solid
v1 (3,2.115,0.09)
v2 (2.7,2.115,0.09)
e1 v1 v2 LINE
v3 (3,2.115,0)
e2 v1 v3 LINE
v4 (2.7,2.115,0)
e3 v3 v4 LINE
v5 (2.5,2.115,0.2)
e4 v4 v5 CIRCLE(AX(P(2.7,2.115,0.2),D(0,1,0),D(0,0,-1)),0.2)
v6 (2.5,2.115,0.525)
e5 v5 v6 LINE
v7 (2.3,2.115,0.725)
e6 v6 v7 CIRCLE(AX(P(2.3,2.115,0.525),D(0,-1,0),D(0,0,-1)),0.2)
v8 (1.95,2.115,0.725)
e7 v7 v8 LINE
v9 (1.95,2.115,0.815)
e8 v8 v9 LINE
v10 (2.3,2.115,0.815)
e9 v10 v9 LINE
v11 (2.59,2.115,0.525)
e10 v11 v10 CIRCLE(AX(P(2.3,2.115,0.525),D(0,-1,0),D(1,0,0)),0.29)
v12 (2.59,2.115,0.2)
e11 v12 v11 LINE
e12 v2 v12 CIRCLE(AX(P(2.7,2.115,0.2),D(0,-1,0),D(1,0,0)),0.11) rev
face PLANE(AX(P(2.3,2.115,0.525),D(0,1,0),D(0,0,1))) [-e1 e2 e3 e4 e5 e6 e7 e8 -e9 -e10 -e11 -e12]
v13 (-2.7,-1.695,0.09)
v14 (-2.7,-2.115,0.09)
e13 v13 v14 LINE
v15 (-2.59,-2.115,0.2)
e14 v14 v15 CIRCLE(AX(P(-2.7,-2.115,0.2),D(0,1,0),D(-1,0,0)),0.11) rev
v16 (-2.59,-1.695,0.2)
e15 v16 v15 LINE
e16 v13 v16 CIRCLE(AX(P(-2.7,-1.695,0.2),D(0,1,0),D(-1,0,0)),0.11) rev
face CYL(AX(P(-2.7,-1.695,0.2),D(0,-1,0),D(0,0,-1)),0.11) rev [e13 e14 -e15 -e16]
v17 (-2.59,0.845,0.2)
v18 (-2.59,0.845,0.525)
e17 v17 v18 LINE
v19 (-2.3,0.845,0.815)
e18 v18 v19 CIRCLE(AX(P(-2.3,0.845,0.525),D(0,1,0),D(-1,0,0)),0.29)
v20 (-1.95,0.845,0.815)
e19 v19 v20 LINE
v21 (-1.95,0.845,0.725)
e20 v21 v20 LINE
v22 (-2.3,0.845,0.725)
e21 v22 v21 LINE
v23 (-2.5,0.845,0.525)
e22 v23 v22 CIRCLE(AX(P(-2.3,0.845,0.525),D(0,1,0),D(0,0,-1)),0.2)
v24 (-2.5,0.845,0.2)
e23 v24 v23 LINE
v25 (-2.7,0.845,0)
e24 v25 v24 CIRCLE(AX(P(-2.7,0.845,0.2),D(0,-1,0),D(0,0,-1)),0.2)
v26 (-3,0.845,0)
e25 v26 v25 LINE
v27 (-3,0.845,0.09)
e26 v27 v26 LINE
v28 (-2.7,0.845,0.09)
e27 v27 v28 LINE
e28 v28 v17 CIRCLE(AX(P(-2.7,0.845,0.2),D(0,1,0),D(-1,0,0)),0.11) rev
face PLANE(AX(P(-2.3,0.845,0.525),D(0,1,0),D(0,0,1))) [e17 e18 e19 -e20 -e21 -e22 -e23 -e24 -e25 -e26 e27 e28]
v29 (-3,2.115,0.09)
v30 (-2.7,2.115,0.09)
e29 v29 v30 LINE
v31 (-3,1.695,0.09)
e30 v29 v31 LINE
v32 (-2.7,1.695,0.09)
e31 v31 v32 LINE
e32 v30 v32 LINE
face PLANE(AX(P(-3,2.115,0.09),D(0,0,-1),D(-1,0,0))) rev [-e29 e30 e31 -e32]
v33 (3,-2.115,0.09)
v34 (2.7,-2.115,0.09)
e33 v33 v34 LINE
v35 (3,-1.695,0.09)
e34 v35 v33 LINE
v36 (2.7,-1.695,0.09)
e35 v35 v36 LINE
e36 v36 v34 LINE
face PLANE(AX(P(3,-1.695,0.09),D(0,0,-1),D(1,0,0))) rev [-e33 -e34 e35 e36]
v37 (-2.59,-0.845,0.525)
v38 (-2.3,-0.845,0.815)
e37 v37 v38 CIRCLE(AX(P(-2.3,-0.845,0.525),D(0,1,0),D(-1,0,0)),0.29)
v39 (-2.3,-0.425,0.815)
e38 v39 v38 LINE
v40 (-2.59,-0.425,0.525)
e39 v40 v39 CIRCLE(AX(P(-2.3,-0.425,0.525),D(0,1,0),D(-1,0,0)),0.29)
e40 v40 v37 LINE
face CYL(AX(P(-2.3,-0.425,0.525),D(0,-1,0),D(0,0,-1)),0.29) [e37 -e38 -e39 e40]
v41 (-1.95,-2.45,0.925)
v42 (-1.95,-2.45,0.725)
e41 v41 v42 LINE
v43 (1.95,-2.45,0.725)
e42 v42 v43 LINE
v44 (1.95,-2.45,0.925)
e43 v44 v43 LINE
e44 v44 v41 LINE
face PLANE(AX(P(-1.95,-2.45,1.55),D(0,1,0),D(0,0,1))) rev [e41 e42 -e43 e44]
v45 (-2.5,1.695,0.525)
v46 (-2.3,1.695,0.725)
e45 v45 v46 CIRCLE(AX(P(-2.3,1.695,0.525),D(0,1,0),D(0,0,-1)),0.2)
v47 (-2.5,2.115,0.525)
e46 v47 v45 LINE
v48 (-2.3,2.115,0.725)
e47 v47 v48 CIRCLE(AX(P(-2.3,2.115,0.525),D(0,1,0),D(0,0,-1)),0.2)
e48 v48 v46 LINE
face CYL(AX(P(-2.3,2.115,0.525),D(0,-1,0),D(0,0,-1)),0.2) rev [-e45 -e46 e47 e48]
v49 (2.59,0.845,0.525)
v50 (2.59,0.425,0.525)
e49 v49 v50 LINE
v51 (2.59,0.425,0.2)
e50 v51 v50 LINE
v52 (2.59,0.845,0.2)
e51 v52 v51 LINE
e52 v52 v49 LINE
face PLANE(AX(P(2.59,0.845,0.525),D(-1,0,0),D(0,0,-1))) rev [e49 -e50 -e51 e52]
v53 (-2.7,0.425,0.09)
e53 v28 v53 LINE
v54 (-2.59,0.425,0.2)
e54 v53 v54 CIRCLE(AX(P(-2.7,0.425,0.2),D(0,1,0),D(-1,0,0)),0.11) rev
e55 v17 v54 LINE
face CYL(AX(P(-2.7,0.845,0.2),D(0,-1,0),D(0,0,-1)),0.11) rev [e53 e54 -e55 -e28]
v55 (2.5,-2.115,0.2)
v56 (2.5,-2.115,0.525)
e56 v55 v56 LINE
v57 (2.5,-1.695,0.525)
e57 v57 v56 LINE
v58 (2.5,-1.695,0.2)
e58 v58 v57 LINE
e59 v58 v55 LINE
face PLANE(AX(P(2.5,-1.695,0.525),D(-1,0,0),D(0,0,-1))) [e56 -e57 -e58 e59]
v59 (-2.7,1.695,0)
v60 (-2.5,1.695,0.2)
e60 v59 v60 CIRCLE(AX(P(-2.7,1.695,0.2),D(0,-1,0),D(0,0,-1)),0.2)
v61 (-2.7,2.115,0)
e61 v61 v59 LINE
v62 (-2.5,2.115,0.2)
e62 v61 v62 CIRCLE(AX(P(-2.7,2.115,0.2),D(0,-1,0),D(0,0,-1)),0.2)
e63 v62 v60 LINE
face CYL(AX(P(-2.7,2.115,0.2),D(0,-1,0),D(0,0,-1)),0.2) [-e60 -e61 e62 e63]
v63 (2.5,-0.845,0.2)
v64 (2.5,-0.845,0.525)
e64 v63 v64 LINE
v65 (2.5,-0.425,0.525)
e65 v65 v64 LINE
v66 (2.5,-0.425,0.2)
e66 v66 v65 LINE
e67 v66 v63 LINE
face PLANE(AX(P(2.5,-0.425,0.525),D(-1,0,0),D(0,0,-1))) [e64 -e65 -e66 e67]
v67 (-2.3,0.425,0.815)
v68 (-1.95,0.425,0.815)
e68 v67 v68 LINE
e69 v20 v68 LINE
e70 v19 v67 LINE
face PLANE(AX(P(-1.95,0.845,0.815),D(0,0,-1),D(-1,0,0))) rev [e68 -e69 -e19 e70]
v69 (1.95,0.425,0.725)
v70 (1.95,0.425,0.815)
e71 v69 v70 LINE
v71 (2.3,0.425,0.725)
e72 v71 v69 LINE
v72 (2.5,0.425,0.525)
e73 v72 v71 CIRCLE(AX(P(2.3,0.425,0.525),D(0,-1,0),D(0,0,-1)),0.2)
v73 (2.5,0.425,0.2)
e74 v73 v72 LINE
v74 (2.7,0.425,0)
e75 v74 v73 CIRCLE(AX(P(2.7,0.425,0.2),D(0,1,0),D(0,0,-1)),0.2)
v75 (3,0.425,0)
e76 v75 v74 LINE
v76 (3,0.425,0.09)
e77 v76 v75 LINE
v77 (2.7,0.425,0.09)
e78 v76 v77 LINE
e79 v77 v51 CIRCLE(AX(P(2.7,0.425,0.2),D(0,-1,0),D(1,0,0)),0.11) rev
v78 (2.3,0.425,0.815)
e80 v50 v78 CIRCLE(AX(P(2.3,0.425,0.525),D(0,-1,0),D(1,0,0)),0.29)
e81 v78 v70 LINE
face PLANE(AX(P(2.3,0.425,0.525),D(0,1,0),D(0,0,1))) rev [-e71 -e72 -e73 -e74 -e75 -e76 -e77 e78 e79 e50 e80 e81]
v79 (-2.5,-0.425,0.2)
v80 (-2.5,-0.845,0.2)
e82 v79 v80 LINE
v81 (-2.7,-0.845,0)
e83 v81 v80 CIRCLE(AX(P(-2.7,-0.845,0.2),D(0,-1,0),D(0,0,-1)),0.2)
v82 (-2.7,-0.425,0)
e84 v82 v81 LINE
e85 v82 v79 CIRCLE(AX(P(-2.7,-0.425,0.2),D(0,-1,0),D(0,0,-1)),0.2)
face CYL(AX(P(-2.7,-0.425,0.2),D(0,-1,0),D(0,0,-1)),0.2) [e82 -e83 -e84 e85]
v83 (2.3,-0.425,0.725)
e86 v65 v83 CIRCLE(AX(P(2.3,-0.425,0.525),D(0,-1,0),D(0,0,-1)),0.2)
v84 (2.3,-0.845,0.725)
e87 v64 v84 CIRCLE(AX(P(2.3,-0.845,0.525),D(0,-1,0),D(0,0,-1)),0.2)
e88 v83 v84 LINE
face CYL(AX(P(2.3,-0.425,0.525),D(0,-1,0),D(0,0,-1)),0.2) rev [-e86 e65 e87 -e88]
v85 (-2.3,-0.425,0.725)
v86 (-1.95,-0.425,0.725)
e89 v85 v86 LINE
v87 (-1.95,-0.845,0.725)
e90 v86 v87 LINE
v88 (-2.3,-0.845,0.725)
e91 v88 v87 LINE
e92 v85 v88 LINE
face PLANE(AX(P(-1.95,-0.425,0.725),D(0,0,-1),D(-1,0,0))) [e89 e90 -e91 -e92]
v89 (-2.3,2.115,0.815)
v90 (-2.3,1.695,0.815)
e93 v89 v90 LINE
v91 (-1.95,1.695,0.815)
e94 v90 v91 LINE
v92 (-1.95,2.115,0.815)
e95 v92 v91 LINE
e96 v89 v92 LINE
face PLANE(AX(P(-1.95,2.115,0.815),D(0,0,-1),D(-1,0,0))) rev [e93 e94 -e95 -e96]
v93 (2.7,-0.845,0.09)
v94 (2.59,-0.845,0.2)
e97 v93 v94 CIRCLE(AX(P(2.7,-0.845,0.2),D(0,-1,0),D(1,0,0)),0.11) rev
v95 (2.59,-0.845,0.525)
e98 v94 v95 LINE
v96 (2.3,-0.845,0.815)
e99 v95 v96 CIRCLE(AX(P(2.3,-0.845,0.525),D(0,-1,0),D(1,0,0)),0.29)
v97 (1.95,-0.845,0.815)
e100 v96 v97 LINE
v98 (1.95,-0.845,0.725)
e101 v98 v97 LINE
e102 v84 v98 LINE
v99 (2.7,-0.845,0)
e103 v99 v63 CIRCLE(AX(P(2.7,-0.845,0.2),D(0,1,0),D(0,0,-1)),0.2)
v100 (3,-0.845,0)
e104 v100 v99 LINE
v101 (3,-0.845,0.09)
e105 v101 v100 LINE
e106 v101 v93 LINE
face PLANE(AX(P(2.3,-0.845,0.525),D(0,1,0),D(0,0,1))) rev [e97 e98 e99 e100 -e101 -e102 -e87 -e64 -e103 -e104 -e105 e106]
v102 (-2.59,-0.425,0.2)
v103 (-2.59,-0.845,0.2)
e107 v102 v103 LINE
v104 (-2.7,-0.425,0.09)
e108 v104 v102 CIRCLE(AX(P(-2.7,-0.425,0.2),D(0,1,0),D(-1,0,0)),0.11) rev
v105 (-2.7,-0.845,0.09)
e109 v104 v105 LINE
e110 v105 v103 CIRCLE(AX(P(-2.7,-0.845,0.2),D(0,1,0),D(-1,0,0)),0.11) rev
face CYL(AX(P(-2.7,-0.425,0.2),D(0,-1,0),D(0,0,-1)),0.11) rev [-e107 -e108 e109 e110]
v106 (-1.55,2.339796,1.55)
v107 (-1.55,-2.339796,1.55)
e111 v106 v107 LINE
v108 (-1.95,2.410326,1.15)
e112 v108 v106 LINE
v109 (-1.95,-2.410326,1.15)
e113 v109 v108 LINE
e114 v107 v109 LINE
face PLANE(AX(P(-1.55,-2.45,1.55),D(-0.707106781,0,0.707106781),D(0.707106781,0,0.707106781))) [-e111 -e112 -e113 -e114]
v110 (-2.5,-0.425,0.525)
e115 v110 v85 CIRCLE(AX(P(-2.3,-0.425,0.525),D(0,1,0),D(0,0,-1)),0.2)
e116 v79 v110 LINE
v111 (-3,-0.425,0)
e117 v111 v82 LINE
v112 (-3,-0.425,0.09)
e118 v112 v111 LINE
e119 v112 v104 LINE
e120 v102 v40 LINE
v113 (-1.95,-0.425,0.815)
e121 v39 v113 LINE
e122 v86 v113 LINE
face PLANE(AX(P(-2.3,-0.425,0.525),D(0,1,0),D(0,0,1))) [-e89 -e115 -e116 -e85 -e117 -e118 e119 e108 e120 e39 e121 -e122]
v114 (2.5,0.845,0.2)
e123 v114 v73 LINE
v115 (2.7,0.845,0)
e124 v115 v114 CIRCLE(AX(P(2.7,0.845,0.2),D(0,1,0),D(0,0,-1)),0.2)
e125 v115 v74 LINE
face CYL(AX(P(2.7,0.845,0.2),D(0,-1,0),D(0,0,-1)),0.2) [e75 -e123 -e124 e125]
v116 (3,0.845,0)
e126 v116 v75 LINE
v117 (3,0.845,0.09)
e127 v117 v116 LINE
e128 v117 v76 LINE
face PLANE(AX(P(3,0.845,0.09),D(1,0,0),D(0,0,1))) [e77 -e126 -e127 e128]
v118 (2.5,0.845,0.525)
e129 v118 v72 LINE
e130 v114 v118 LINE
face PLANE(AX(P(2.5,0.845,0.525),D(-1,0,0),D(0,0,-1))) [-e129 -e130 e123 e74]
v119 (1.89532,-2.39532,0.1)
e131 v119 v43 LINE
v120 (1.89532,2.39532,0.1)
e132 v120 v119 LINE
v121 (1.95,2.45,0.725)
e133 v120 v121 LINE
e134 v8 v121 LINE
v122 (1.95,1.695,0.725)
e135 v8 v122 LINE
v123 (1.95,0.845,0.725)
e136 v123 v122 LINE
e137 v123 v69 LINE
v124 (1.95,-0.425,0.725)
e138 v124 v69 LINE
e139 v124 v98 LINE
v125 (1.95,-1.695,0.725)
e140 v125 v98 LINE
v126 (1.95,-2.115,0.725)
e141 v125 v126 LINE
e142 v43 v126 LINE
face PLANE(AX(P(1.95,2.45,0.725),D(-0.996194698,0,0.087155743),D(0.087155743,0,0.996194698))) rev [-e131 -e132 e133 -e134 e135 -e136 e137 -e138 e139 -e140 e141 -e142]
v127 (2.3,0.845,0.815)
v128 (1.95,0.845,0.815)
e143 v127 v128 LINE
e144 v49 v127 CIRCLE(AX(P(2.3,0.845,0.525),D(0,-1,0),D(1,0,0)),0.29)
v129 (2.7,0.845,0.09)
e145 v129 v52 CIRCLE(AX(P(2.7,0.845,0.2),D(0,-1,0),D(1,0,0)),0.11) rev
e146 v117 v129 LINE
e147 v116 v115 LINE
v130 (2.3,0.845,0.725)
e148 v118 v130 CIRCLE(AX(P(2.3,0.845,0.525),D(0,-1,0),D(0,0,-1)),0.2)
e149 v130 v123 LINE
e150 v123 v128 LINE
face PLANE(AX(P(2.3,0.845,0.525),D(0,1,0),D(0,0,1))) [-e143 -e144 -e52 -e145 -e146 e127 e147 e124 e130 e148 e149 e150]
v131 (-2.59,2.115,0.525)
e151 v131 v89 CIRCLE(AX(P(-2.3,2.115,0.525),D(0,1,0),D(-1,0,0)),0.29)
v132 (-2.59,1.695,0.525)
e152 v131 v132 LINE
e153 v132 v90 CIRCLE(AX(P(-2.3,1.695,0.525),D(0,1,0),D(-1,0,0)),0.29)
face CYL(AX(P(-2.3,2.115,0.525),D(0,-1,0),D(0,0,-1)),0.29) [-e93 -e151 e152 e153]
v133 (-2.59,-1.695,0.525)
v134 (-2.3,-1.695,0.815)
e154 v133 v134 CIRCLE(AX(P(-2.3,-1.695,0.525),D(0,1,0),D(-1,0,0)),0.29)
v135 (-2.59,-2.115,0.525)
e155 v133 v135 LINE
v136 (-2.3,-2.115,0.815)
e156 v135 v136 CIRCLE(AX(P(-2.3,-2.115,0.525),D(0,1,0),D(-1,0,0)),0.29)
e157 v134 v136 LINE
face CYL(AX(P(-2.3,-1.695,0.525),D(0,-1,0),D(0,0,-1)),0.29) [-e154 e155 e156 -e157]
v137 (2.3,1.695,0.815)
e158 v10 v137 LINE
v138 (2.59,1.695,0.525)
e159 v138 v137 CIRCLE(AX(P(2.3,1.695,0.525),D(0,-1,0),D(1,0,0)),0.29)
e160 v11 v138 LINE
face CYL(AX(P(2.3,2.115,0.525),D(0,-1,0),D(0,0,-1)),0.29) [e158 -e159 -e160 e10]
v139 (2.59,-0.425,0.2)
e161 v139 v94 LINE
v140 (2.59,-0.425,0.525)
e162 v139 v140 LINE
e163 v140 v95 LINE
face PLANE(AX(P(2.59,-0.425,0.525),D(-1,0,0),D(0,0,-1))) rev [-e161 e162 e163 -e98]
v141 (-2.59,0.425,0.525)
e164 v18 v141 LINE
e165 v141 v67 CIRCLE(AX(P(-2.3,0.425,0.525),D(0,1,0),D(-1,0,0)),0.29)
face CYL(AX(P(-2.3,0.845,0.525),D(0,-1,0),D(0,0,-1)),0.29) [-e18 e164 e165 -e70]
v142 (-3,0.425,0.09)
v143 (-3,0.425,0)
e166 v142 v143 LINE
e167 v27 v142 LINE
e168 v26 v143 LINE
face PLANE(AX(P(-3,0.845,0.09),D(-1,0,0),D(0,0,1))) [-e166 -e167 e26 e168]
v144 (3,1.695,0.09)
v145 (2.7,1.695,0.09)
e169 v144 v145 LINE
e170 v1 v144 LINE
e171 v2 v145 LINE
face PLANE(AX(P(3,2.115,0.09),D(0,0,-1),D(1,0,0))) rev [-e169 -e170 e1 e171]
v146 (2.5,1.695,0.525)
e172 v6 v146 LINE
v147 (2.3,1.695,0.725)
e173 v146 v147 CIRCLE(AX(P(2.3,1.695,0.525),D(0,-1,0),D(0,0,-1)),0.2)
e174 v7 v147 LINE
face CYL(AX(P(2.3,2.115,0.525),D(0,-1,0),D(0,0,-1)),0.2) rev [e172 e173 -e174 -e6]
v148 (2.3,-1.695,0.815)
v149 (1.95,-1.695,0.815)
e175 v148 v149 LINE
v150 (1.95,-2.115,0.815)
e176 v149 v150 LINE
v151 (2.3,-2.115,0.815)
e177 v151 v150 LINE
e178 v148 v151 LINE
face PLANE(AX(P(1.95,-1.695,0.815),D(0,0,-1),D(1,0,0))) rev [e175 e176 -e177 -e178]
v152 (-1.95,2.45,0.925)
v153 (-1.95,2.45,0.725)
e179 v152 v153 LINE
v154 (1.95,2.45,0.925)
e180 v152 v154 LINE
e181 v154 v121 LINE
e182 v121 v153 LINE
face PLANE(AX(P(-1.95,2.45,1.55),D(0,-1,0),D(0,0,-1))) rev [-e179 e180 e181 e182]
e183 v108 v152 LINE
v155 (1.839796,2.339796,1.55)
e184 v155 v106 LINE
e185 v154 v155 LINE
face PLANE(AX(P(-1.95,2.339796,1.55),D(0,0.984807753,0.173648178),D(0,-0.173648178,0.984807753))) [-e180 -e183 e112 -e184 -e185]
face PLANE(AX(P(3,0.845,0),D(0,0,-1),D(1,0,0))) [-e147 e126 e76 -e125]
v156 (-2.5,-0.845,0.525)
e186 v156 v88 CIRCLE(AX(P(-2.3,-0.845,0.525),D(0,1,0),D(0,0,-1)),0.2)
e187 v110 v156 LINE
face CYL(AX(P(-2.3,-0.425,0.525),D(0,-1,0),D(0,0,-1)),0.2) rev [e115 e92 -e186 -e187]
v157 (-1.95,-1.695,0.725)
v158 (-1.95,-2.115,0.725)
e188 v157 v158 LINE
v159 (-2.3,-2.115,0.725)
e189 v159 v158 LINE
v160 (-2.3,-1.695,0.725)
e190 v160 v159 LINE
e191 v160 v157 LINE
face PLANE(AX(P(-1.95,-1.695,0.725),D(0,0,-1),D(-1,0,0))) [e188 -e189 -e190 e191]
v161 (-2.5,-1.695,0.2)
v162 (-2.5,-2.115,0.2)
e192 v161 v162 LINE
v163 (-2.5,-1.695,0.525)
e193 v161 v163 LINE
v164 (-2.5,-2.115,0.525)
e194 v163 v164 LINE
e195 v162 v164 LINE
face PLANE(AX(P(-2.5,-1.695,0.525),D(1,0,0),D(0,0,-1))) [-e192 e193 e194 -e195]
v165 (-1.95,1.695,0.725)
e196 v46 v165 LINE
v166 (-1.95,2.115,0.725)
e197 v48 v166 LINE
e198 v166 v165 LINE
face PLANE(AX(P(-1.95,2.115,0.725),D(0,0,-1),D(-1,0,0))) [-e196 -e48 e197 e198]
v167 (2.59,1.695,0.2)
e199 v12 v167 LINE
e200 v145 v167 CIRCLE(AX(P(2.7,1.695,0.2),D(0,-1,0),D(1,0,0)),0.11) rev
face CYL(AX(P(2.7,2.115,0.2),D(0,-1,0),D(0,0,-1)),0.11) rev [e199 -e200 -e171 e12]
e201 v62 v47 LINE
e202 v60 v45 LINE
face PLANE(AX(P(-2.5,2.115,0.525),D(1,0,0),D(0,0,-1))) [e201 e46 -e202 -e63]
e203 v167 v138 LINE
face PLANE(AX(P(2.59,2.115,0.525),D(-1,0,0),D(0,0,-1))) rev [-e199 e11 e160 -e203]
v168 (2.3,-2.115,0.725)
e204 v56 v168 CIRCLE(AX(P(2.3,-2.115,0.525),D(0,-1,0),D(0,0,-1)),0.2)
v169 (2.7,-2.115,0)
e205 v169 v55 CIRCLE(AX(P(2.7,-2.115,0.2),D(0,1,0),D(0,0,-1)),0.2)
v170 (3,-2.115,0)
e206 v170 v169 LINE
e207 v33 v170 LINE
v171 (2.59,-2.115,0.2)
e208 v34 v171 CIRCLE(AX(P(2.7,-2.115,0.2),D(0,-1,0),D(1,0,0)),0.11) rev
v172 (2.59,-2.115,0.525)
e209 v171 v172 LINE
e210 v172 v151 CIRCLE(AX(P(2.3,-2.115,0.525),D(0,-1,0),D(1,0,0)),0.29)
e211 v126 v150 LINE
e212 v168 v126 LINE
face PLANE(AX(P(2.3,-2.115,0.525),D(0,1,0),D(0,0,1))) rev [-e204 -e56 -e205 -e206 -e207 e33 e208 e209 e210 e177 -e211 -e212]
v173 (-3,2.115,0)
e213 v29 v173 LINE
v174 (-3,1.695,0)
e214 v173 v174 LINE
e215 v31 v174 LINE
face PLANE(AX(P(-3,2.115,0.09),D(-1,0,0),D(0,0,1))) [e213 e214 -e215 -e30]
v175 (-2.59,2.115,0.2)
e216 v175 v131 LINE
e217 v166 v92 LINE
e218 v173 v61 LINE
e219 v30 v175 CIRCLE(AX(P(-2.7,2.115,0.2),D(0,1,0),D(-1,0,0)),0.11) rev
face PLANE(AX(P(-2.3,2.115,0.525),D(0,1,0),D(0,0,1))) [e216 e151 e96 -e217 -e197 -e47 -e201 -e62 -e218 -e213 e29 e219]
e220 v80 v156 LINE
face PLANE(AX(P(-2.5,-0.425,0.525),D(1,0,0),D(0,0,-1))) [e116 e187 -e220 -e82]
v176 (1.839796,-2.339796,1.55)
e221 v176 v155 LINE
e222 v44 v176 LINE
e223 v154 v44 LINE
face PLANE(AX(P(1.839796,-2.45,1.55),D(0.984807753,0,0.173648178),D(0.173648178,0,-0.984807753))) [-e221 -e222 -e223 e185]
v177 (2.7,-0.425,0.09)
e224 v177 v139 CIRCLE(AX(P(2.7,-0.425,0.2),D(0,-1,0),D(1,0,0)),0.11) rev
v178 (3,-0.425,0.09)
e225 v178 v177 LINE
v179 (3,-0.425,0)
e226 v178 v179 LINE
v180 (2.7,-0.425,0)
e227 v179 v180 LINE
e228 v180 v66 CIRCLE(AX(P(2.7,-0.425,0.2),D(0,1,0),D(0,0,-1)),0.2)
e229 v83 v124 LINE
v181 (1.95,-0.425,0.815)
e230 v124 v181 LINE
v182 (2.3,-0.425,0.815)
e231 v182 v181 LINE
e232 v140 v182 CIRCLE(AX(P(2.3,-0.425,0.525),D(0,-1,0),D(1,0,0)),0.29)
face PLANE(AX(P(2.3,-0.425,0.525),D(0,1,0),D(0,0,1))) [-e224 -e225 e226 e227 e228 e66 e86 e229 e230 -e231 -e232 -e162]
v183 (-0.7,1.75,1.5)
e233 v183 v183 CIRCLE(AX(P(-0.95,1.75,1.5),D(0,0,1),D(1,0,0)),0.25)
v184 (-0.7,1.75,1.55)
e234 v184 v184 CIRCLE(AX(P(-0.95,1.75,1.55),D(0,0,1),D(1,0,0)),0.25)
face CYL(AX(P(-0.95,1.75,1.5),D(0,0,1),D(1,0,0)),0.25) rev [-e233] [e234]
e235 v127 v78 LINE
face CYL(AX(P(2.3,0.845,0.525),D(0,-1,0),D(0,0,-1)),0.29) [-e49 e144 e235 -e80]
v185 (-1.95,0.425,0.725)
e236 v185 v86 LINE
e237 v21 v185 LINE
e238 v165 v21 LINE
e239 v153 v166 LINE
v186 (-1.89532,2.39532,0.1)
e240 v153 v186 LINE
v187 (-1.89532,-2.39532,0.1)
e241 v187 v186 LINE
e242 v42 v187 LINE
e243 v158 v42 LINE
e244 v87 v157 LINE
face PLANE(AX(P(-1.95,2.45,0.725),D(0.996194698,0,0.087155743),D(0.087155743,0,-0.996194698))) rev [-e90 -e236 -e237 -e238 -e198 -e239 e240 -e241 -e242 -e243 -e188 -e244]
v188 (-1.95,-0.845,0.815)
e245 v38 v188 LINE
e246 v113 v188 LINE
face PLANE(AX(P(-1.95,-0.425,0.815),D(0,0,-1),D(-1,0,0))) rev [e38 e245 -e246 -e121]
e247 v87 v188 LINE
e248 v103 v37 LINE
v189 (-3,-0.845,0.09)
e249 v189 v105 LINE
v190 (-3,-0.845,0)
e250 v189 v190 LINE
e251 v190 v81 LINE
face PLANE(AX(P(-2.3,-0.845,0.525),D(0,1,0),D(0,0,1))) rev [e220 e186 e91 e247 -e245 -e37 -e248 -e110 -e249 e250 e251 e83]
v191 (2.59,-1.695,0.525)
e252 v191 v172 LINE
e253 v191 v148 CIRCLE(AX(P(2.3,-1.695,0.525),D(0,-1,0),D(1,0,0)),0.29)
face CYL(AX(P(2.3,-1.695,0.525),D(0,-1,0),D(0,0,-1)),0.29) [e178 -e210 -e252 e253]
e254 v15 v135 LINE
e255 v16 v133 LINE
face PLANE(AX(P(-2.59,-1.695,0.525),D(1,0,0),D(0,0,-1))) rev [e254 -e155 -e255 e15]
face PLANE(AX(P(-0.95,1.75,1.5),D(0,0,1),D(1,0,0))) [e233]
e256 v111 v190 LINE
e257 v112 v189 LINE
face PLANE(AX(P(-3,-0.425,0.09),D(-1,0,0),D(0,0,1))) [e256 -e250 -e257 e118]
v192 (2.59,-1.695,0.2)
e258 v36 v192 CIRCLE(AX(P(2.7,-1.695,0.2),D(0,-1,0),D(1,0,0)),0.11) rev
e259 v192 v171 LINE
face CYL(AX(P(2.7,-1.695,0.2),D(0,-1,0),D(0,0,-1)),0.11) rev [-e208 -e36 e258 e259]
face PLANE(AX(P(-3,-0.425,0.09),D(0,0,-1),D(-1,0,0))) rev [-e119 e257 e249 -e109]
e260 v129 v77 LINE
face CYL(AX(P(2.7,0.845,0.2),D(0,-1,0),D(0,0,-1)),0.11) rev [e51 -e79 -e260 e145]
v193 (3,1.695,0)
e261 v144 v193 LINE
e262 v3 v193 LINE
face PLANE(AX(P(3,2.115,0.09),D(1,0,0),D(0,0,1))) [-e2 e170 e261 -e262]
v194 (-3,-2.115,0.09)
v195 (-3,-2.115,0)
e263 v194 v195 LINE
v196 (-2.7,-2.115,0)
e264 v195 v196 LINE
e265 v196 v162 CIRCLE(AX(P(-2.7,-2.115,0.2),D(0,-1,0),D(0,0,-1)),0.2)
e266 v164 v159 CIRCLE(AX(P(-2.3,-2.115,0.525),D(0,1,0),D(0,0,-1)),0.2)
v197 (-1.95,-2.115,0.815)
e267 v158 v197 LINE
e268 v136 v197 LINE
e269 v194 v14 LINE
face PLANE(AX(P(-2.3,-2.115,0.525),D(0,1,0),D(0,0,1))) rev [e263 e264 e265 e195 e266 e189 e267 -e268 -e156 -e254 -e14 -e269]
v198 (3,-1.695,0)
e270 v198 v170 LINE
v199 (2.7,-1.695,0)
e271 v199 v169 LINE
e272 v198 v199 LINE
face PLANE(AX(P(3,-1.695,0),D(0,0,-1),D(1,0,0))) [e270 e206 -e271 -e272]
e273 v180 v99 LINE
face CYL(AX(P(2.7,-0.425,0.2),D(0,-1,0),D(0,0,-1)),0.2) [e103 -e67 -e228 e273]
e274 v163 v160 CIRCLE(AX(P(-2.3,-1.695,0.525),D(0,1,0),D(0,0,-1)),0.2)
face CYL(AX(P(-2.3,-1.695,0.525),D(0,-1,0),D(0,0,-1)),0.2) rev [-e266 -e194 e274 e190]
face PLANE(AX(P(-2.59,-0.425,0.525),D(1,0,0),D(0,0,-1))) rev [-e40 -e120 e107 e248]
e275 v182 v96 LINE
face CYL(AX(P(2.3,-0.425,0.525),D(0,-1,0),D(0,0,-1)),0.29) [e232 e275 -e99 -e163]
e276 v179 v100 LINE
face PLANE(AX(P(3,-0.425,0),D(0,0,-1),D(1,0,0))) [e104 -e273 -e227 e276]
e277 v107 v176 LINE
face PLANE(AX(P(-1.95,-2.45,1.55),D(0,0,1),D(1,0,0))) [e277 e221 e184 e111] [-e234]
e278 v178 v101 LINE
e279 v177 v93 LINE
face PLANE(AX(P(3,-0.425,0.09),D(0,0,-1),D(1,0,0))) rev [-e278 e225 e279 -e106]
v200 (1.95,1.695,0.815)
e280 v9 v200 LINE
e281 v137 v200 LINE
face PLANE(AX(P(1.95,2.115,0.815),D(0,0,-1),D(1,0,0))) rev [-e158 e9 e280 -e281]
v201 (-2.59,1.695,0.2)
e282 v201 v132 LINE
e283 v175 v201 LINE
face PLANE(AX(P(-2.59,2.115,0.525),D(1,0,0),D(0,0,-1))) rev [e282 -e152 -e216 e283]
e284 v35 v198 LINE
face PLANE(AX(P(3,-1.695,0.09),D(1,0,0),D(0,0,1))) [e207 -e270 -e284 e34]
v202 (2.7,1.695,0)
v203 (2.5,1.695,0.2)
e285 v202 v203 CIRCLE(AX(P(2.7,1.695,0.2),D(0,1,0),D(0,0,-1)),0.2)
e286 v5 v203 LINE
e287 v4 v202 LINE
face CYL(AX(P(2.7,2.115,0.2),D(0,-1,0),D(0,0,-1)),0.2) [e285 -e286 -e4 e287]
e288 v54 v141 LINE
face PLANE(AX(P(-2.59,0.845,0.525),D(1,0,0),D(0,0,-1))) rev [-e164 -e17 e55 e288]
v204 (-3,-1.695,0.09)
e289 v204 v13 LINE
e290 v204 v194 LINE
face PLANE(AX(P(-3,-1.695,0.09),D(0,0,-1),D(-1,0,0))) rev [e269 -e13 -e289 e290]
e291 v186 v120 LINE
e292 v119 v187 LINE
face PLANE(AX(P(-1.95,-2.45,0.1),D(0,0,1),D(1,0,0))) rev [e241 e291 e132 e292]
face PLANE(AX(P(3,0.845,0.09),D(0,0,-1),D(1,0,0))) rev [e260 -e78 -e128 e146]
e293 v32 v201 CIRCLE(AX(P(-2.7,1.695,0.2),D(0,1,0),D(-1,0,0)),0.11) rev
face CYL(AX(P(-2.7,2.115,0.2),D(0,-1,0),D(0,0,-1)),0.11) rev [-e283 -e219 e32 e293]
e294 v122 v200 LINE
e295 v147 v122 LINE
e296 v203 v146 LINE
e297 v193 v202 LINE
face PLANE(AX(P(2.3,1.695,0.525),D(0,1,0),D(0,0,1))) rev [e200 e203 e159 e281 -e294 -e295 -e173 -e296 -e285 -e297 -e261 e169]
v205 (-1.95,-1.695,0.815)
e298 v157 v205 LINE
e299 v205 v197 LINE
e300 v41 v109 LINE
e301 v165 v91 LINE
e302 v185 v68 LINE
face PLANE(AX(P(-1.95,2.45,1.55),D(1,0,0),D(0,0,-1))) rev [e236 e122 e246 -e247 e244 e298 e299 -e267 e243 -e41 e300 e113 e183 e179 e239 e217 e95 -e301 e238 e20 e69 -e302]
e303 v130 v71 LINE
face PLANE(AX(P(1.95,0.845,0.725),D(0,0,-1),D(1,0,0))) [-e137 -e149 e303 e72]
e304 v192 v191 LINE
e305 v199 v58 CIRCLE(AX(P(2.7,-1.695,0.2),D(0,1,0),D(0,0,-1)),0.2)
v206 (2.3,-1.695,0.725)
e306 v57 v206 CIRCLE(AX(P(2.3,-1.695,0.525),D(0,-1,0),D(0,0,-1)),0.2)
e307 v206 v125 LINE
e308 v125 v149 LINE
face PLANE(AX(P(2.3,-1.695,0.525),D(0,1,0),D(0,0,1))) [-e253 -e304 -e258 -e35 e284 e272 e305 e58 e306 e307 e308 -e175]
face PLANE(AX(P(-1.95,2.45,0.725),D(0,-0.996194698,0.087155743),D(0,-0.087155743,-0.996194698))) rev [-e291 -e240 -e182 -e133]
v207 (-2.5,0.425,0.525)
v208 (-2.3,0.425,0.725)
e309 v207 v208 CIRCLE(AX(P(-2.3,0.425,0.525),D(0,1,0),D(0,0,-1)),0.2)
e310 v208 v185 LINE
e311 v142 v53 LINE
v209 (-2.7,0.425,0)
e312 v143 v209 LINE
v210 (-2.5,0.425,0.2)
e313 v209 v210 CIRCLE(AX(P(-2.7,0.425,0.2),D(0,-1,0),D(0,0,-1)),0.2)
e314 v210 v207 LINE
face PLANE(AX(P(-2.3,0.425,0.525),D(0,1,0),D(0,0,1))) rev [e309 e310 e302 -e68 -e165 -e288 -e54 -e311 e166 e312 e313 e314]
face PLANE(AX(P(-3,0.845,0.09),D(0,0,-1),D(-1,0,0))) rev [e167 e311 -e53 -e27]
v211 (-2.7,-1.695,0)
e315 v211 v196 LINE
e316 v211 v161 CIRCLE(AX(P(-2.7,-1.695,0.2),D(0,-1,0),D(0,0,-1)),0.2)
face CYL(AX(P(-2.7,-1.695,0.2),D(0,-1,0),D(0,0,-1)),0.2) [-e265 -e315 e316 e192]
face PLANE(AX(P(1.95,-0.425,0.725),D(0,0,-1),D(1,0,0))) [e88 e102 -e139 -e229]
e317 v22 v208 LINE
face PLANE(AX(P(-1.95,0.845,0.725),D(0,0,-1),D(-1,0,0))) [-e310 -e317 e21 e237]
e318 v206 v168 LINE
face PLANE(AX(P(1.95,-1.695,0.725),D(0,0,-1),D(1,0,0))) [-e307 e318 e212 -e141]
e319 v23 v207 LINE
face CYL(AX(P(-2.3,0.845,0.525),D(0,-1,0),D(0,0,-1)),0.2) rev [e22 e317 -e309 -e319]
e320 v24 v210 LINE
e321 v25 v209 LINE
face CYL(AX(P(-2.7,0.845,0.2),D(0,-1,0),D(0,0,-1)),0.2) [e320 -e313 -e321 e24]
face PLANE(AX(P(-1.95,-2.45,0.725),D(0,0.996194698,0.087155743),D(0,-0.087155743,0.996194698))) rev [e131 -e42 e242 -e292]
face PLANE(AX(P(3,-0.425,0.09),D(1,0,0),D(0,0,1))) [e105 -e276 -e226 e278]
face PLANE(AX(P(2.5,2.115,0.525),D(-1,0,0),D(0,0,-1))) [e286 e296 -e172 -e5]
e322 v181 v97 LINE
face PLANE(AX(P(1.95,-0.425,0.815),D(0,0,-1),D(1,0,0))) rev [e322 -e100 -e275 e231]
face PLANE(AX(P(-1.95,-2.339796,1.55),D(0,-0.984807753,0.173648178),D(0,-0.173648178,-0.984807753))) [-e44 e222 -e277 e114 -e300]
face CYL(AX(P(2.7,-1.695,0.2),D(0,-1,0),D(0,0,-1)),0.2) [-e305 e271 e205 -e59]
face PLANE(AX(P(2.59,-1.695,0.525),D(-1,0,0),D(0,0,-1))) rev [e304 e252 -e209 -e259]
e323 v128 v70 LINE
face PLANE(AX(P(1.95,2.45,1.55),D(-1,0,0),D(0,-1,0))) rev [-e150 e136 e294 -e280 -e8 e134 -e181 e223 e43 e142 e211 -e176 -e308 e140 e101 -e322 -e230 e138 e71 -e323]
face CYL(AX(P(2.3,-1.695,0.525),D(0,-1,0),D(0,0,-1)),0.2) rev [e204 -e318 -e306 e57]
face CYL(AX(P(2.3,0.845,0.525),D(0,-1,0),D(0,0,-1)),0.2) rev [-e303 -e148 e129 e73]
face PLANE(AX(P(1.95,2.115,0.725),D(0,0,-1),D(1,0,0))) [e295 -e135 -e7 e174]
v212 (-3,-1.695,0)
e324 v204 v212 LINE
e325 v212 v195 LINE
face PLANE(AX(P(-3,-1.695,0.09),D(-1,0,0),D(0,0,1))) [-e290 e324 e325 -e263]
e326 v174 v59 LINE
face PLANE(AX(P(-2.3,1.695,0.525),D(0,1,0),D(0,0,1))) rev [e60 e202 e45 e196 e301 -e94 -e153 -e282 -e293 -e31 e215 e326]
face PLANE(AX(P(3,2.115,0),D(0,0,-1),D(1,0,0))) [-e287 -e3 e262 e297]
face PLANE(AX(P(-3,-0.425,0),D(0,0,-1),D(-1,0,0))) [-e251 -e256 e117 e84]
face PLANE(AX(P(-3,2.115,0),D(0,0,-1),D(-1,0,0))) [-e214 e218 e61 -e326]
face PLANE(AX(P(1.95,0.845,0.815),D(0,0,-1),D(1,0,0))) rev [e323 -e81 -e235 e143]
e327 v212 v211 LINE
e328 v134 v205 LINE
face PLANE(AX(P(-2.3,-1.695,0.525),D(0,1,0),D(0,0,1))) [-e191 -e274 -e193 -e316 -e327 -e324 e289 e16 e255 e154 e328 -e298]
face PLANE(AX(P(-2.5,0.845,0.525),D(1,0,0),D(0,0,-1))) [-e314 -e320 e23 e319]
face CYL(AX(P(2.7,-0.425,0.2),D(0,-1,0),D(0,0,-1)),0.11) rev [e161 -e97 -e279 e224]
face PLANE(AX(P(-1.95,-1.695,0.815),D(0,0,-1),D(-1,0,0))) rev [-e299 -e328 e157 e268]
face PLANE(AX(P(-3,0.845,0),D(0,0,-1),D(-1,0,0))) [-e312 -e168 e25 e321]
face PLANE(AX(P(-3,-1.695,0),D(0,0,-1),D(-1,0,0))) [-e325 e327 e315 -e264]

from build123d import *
from OCP.BRepFilletAPI import BRepFilletAPI_MakeChamfer

# Parameters (mm, degrees)
ESQUISSE2_W              = 3.9
ESQUISSE2_H              = 4.9
CORP_DEPTH               = 1.45
PIN_1_DEPTH              = 0.21
R_P_TITION_PIN_1_4_COUNT = 4
R_P_TITION_PIN_1_4_PITCH = 1.27
SYM_TRIE1_COPY_1_DEPTH   = 0.21
SYM_TRIE1_COPY_2_DEPTH   = 0.21
SYM_TRIE1_COPY_3_DEPTH   = 0.21
CHANFREIN4_SIZE          = 0.625
CHANFREIN4_SIZE2         = 0.110204363
CHANFREIN5_SIZE          = 0.625
CHANFREIN5_SIZE_2        = 0.054680415
ESQUISSE8_R              = 0.25
ENL_V_MAT_EXTRU_1_DEPTH  = 0.05
CHANFREIN7_SIZE          = 0.4


with BuildPart() as part:
    # Esquisse2 → corp (new body)
    with BuildSketch(Plane.XY.offset(0.1)):
        Rectangle(ESQUISSE2_W, ESQUISSE2_H)
    extrude(amount=CORP_DEPTH)

    # Esquisse6 → pin 1 (add, symmetric)
    with BuildSketch(Plane(origin=(0, 1.905, 0), x_dir=(-1, 0, 0), z_dir=(0, 1, 0))):
        with BuildLine():
            Line((1.95, 0.725), (2.3, 0.725))
            ThreePointArc((2.3, 0.725), (2.441421356, 0.666421356), (2.5, 0.525))
            Line((2.5, 0.525), (2.5, 0.2))
            ThreePointArc((2.5, 0.2), (2.558578644, 0.058578644), (2.7, 0))
            Line((2.7, 0), (3, 0))
            Line((3, 0), (3, 0.09))
            Line((3, 0.09), (2.7, 0.09))
            ThreePointArc((2.7, 0.09), (2.622218254, 0.122218254), (2.59, 0.2))
            Line((2.59, 0.2), (2.59, 0.525))
            ThreePointArc((2.59, 0.525), (2.505060967, 0.730060967), (2.3, 0.815))
            Line((2.3, 0.815), (1.95, 0.815))
            Line((1.95, 0.815), (1.95, 0.725))
        make_face()
    pin_1 = extrude(amount=PIN_1_DEPTH, both=True)

    # Répétition pin 1-4: pin 1 ×4
    with Locations(*[(0, -i * R_P_TITION_PIN_1_4_PITCH, 0) for i in range(1, R_P_TITION_PIN_1_4_COUNT)]):
        add(pin_1)

    # Symétrie1: pin 1 across plane
    add(pin_1.mirror(Plane(origin=(0, 0, 0), x_dir=(0, 0, 1), z_dir=(1, 0, 0))))

    # Symétrie1 copy 1 sketch → Symétrie1 copy 1 (add, symmetric)
    with BuildSketch(Plane(origin=(0, 0.635, 0), x_dir=(1, 0, 0), z_dir=(0, 1, 0))):
        with BuildLine():
            Line((1.95, -0.725), (2.3, -0.725))
            ThreePointArc((2.3, -0.725), (2.441421356, -0.666421356), (2.5, -0.525))
            Line((2.5, -0.525), (2.5, -0.2))
            ThreePointArc((2.5, -0.2), (2.558578644, -0.058578644), (2.7, 0))
            Line((2.7, 0), (3, 0))
            Line((3, 0), (3, -0.09))
            Line((3, -0.09), (2.7, -0.09))
            ThreePointArc((2.7, -0.09), (2.622218254, -0.122218254), (2.59, -0.2))
            Line((2.59, -0.2), (2.59, -0.525))
            ThreePointArc((2.59, -0.525), (2.505060967, -0.730060967), (2.3, -0.815))
            Line((2.3, -0.815), (1.95, -0.815))
            Line((1.95, -0.815), (1.95, -0.725))
        make_face()
    extrude(amount=SYM_TRIE1_COPY_1_DEPTH, both=True)

    # Symétrie1 copy 2 sketch → Symétrie1 copy 2 (add, symmetric)
    with BuildSketch(Plane(origin=(0, -0.635, 0), x_dir=(1, 0, 0), z_dir=(0, 1, 0))):
        with BuildLine():
            Line((1.95, -0.725), (2.3, -0.725))
            ThreePointArc((2.3, -0.725), (2.441421356, -0.666421356), (2.5, -0.525))
            Line((2.5, -0.525), (2.5, -0.2))
            ThreePointArc((2.5, -0.2), (2.558578644, -0.058578644), (2.7, 0))
            Line((2.7, 0), (3, 0))
            Line((3, 0), (3, -0.09))
            Line((3, -0.09), (2.7, -0.09))
            ThreePointArc((2.7, -0.09), (2.622218254, -0.122218254), (2.59, -0.2))
            Line((2.59, -0.2), (2.59, -0.525))
            ThreePointArc((2.59, -0.525), (2.505060967, -0.730060967), (2.3, -0.815))
            Line((2.3, -0.815), (1.95, -0.815))
            Line((1.95, -0.815), (1.95, -0.725))
        make_face()
    extrude(amount=SYM_TRIE1_COPY_2_DEPTH, both=True)

    # Symétrie1 copy 3 sketch → Symétrie1 copy 3 (add, symmetric)
    with BuildSketch(Plane(origin=(0, -1.905, 0), x_dir=(1, 0, 0), z_dir=(0, 1, 0))):
        with BuildLine():
            Line((1.95, -0.725), (2.3, -0.725))
            ThreePointArc((2.3, -0.725), (2.441421356, -0.666421356), (2.5, -0.525))
            Line((2.5, -0.525), (2.5, -0.2))
            ThreePointArc((2.5, -0.2), (2.558578644, -0.058578644), (2.7, 0))
            Line((2.7, 0), (3, 0))
            Line((3, 0), (3, -0.09))
            Line((3, -0.09), (2.7, -0.09))
            ThreePointArc((2.7, -0.09), (2.622218254, -0.122218254), (2.59, -0.2))
            Line((2.59, -0.2), (2.59, -0.525))
            ThreePointArc((2.59, -0.525), (2.505060967, -0.730060967), (2.3, -0.815))
            Line((2.3, -0.815), (1.95, -0.815))
            Line((1.95, -0.815), (1.95, -0.725))
        make_face()
    extrude(amount=SYM_TRIE1_COPY_3_DEPTH, both=True)

    # Chanfrein4: one chamfer whose edges measure the first distance from different faces: ONE call of the kernel's chamfer builder (chamfer() names one face for all edges)
    chanfrein4_edges_1 = [part.edges().sort_by_distance(p)[0] for p in [
        (1.95, 0, 1.55),
    ]]
    chanfrein4_side_1 = [part.faces().sort_by_distance(p)[0] for p in [
        (1.95, 0, 0.826195893),
    ]]
    chanfrein4_edges_2 = [part.edges().sort_by_distance(p)[0] for p in [
        (0, 2.45, 1.55),
    ]]
    chanfrein4_side_2 = [part.faces().sort_by_distance(p)[0] for p in [
        (0, 2.45, 0.825),
    ]]
    chanfrein4_edges_3 = [part.edges().sort_by_distance(p)[0] for p in [
        (0, -2.45, 1.55),
    ]]
    chanfrein4_side_3 = [part.faces().sort_by_distance(p)[0] for p in [
        (0, -2.45, 0.825),
    ]]
    chanfrein4 = BRepFilletAPI_MakeChamfer(part.part.solid().wrapped)
    for e in chanfrein4_edges_1:
        chanfrein4.Add(CHANFREIN4_SIZE, CHANFREIN4_SIZE2, e.wrapped, chanfrein4_side_1[0].wrapped)  # the first distance lies on this face
    for e in chanfrein4_edges_2:
        chanfrein4.Add(CHANFREIN4_SIZE, CHANFREIN4_SIZE2, e.wrapped, chanfrein4_side_2[0].wrapped)  # the first distance lies on this face
    for e in chanfrein4_edges_3:
        chanfrein4.Add(CHANFREIN4_SIZE, CHANFREIN4_SIZE2, e.wrapped, chanfrein4_side_3[0].wrapped)  # the first distance lies on this face
    add(Compound.cast(chanfrein4.Shape()), mode=Mode.REPLACE)

    # Chanfrein5
    chanfrein5_edges_1 = [part.edges().sort_by_distance(p)[0] for p in [
        (0, 2.45, 0.1),
    ]]
    chanfrein5_side_1 = [part.faces().sort_by_distance(p)[0] for p in [
        (0, 2.45, 0.101093608),
    ]]
    chanfrein5_edges_2 = [part.edges().sort_by_distance(p)[0] for p in [
        (1.95, 0, 0.1),
    ]]
    chanfrein5_side_2 = [part.faces().sort_by_distance(p)[0] for p in [
        (1.948906392, 0, 0.1),
    ]]
    chanfrein5_edges_3 = [part.edges().sort_by_distance(p)[0] for p in [
        (0, -2.45, 0.1),
    ]]
    chanfrein5_side_3 = [part.faces().sort_by_distance(p)[0] for p in [
        (0, -2.448906392, 0.1),
    ]]
    chanfrein5_edges_4 = [part.edges().sort_by_distance(p)[0] for p in [
        (-1.95, 0, 0.1),
    ]]
    chanfrein5_side_4 = [part.faces().sort_by_distance(p)[0] for p in [
        (-1.95, 0, 0.101093608),
    ]]
    chanfrein5 = BRepFilletAPI_MakeChamfer(part.part.solid().wrapped)
    for e in chanfrein5_edges_1:
        chanfrein5.Add(CHANFREIN5_SIZE - 0.0001, CHANFREIN5_SIZE_2 - 0.0001, e.wrapped, chanfrein5_side_1[0].wrapped)
    for e in chanfrein5_edges_2:
        chanfrein5.Add(CHANFREIN5_SIZE_2 - 0.0001, CHANFREIN5_SIZE - 0.0001, e.wrapped, chanfrein5_side_2[0].wrapped)
    for e in chanfrein5_edges_3:
        chanfrein5.Add(CHANFREIN5_SIZE_2 - 0.0001, CHANFREIN5_SIZE - 0.0001, e.wrapped, chanfrein5_side_3[0].wrapped)
    for e in chanfrein5_edges_4:
        chanfrein5.Add(CHANFREIN5_SIZE - 0.0001, CHANFREIN5_SIZE_2 - 0.0001, e.wrapped, chanfrein5_side_4[0].wrapped)
    add(Compound.cast(chanfrein5.Shape()), mode=Mode.REPLACE)  # a hair under: the kernel refuses the full size

    # Esquisse8 → Enlèv. mat.-Extru.1 (cut)
    with BuildSketch(Plane.XY.offset(1.55)):
        with Locations((-0.95, 1.75)):
            Circle(ESQUISSE8_R)
    extrude(amount=-ENL_V_MAT_EXTRU_1_DEPTH, mode=Mode.SUBTRACT)

    # Chanfrein7
    chanfrein7_edges = [part.edges().sort_by_distance(p)[0] for p in [
        (-1.95, 0, 1.55),
    ]]
    chamfer(chanfrein7_edges, length=CHANFREIN7_SIZE)


solid = part.part
